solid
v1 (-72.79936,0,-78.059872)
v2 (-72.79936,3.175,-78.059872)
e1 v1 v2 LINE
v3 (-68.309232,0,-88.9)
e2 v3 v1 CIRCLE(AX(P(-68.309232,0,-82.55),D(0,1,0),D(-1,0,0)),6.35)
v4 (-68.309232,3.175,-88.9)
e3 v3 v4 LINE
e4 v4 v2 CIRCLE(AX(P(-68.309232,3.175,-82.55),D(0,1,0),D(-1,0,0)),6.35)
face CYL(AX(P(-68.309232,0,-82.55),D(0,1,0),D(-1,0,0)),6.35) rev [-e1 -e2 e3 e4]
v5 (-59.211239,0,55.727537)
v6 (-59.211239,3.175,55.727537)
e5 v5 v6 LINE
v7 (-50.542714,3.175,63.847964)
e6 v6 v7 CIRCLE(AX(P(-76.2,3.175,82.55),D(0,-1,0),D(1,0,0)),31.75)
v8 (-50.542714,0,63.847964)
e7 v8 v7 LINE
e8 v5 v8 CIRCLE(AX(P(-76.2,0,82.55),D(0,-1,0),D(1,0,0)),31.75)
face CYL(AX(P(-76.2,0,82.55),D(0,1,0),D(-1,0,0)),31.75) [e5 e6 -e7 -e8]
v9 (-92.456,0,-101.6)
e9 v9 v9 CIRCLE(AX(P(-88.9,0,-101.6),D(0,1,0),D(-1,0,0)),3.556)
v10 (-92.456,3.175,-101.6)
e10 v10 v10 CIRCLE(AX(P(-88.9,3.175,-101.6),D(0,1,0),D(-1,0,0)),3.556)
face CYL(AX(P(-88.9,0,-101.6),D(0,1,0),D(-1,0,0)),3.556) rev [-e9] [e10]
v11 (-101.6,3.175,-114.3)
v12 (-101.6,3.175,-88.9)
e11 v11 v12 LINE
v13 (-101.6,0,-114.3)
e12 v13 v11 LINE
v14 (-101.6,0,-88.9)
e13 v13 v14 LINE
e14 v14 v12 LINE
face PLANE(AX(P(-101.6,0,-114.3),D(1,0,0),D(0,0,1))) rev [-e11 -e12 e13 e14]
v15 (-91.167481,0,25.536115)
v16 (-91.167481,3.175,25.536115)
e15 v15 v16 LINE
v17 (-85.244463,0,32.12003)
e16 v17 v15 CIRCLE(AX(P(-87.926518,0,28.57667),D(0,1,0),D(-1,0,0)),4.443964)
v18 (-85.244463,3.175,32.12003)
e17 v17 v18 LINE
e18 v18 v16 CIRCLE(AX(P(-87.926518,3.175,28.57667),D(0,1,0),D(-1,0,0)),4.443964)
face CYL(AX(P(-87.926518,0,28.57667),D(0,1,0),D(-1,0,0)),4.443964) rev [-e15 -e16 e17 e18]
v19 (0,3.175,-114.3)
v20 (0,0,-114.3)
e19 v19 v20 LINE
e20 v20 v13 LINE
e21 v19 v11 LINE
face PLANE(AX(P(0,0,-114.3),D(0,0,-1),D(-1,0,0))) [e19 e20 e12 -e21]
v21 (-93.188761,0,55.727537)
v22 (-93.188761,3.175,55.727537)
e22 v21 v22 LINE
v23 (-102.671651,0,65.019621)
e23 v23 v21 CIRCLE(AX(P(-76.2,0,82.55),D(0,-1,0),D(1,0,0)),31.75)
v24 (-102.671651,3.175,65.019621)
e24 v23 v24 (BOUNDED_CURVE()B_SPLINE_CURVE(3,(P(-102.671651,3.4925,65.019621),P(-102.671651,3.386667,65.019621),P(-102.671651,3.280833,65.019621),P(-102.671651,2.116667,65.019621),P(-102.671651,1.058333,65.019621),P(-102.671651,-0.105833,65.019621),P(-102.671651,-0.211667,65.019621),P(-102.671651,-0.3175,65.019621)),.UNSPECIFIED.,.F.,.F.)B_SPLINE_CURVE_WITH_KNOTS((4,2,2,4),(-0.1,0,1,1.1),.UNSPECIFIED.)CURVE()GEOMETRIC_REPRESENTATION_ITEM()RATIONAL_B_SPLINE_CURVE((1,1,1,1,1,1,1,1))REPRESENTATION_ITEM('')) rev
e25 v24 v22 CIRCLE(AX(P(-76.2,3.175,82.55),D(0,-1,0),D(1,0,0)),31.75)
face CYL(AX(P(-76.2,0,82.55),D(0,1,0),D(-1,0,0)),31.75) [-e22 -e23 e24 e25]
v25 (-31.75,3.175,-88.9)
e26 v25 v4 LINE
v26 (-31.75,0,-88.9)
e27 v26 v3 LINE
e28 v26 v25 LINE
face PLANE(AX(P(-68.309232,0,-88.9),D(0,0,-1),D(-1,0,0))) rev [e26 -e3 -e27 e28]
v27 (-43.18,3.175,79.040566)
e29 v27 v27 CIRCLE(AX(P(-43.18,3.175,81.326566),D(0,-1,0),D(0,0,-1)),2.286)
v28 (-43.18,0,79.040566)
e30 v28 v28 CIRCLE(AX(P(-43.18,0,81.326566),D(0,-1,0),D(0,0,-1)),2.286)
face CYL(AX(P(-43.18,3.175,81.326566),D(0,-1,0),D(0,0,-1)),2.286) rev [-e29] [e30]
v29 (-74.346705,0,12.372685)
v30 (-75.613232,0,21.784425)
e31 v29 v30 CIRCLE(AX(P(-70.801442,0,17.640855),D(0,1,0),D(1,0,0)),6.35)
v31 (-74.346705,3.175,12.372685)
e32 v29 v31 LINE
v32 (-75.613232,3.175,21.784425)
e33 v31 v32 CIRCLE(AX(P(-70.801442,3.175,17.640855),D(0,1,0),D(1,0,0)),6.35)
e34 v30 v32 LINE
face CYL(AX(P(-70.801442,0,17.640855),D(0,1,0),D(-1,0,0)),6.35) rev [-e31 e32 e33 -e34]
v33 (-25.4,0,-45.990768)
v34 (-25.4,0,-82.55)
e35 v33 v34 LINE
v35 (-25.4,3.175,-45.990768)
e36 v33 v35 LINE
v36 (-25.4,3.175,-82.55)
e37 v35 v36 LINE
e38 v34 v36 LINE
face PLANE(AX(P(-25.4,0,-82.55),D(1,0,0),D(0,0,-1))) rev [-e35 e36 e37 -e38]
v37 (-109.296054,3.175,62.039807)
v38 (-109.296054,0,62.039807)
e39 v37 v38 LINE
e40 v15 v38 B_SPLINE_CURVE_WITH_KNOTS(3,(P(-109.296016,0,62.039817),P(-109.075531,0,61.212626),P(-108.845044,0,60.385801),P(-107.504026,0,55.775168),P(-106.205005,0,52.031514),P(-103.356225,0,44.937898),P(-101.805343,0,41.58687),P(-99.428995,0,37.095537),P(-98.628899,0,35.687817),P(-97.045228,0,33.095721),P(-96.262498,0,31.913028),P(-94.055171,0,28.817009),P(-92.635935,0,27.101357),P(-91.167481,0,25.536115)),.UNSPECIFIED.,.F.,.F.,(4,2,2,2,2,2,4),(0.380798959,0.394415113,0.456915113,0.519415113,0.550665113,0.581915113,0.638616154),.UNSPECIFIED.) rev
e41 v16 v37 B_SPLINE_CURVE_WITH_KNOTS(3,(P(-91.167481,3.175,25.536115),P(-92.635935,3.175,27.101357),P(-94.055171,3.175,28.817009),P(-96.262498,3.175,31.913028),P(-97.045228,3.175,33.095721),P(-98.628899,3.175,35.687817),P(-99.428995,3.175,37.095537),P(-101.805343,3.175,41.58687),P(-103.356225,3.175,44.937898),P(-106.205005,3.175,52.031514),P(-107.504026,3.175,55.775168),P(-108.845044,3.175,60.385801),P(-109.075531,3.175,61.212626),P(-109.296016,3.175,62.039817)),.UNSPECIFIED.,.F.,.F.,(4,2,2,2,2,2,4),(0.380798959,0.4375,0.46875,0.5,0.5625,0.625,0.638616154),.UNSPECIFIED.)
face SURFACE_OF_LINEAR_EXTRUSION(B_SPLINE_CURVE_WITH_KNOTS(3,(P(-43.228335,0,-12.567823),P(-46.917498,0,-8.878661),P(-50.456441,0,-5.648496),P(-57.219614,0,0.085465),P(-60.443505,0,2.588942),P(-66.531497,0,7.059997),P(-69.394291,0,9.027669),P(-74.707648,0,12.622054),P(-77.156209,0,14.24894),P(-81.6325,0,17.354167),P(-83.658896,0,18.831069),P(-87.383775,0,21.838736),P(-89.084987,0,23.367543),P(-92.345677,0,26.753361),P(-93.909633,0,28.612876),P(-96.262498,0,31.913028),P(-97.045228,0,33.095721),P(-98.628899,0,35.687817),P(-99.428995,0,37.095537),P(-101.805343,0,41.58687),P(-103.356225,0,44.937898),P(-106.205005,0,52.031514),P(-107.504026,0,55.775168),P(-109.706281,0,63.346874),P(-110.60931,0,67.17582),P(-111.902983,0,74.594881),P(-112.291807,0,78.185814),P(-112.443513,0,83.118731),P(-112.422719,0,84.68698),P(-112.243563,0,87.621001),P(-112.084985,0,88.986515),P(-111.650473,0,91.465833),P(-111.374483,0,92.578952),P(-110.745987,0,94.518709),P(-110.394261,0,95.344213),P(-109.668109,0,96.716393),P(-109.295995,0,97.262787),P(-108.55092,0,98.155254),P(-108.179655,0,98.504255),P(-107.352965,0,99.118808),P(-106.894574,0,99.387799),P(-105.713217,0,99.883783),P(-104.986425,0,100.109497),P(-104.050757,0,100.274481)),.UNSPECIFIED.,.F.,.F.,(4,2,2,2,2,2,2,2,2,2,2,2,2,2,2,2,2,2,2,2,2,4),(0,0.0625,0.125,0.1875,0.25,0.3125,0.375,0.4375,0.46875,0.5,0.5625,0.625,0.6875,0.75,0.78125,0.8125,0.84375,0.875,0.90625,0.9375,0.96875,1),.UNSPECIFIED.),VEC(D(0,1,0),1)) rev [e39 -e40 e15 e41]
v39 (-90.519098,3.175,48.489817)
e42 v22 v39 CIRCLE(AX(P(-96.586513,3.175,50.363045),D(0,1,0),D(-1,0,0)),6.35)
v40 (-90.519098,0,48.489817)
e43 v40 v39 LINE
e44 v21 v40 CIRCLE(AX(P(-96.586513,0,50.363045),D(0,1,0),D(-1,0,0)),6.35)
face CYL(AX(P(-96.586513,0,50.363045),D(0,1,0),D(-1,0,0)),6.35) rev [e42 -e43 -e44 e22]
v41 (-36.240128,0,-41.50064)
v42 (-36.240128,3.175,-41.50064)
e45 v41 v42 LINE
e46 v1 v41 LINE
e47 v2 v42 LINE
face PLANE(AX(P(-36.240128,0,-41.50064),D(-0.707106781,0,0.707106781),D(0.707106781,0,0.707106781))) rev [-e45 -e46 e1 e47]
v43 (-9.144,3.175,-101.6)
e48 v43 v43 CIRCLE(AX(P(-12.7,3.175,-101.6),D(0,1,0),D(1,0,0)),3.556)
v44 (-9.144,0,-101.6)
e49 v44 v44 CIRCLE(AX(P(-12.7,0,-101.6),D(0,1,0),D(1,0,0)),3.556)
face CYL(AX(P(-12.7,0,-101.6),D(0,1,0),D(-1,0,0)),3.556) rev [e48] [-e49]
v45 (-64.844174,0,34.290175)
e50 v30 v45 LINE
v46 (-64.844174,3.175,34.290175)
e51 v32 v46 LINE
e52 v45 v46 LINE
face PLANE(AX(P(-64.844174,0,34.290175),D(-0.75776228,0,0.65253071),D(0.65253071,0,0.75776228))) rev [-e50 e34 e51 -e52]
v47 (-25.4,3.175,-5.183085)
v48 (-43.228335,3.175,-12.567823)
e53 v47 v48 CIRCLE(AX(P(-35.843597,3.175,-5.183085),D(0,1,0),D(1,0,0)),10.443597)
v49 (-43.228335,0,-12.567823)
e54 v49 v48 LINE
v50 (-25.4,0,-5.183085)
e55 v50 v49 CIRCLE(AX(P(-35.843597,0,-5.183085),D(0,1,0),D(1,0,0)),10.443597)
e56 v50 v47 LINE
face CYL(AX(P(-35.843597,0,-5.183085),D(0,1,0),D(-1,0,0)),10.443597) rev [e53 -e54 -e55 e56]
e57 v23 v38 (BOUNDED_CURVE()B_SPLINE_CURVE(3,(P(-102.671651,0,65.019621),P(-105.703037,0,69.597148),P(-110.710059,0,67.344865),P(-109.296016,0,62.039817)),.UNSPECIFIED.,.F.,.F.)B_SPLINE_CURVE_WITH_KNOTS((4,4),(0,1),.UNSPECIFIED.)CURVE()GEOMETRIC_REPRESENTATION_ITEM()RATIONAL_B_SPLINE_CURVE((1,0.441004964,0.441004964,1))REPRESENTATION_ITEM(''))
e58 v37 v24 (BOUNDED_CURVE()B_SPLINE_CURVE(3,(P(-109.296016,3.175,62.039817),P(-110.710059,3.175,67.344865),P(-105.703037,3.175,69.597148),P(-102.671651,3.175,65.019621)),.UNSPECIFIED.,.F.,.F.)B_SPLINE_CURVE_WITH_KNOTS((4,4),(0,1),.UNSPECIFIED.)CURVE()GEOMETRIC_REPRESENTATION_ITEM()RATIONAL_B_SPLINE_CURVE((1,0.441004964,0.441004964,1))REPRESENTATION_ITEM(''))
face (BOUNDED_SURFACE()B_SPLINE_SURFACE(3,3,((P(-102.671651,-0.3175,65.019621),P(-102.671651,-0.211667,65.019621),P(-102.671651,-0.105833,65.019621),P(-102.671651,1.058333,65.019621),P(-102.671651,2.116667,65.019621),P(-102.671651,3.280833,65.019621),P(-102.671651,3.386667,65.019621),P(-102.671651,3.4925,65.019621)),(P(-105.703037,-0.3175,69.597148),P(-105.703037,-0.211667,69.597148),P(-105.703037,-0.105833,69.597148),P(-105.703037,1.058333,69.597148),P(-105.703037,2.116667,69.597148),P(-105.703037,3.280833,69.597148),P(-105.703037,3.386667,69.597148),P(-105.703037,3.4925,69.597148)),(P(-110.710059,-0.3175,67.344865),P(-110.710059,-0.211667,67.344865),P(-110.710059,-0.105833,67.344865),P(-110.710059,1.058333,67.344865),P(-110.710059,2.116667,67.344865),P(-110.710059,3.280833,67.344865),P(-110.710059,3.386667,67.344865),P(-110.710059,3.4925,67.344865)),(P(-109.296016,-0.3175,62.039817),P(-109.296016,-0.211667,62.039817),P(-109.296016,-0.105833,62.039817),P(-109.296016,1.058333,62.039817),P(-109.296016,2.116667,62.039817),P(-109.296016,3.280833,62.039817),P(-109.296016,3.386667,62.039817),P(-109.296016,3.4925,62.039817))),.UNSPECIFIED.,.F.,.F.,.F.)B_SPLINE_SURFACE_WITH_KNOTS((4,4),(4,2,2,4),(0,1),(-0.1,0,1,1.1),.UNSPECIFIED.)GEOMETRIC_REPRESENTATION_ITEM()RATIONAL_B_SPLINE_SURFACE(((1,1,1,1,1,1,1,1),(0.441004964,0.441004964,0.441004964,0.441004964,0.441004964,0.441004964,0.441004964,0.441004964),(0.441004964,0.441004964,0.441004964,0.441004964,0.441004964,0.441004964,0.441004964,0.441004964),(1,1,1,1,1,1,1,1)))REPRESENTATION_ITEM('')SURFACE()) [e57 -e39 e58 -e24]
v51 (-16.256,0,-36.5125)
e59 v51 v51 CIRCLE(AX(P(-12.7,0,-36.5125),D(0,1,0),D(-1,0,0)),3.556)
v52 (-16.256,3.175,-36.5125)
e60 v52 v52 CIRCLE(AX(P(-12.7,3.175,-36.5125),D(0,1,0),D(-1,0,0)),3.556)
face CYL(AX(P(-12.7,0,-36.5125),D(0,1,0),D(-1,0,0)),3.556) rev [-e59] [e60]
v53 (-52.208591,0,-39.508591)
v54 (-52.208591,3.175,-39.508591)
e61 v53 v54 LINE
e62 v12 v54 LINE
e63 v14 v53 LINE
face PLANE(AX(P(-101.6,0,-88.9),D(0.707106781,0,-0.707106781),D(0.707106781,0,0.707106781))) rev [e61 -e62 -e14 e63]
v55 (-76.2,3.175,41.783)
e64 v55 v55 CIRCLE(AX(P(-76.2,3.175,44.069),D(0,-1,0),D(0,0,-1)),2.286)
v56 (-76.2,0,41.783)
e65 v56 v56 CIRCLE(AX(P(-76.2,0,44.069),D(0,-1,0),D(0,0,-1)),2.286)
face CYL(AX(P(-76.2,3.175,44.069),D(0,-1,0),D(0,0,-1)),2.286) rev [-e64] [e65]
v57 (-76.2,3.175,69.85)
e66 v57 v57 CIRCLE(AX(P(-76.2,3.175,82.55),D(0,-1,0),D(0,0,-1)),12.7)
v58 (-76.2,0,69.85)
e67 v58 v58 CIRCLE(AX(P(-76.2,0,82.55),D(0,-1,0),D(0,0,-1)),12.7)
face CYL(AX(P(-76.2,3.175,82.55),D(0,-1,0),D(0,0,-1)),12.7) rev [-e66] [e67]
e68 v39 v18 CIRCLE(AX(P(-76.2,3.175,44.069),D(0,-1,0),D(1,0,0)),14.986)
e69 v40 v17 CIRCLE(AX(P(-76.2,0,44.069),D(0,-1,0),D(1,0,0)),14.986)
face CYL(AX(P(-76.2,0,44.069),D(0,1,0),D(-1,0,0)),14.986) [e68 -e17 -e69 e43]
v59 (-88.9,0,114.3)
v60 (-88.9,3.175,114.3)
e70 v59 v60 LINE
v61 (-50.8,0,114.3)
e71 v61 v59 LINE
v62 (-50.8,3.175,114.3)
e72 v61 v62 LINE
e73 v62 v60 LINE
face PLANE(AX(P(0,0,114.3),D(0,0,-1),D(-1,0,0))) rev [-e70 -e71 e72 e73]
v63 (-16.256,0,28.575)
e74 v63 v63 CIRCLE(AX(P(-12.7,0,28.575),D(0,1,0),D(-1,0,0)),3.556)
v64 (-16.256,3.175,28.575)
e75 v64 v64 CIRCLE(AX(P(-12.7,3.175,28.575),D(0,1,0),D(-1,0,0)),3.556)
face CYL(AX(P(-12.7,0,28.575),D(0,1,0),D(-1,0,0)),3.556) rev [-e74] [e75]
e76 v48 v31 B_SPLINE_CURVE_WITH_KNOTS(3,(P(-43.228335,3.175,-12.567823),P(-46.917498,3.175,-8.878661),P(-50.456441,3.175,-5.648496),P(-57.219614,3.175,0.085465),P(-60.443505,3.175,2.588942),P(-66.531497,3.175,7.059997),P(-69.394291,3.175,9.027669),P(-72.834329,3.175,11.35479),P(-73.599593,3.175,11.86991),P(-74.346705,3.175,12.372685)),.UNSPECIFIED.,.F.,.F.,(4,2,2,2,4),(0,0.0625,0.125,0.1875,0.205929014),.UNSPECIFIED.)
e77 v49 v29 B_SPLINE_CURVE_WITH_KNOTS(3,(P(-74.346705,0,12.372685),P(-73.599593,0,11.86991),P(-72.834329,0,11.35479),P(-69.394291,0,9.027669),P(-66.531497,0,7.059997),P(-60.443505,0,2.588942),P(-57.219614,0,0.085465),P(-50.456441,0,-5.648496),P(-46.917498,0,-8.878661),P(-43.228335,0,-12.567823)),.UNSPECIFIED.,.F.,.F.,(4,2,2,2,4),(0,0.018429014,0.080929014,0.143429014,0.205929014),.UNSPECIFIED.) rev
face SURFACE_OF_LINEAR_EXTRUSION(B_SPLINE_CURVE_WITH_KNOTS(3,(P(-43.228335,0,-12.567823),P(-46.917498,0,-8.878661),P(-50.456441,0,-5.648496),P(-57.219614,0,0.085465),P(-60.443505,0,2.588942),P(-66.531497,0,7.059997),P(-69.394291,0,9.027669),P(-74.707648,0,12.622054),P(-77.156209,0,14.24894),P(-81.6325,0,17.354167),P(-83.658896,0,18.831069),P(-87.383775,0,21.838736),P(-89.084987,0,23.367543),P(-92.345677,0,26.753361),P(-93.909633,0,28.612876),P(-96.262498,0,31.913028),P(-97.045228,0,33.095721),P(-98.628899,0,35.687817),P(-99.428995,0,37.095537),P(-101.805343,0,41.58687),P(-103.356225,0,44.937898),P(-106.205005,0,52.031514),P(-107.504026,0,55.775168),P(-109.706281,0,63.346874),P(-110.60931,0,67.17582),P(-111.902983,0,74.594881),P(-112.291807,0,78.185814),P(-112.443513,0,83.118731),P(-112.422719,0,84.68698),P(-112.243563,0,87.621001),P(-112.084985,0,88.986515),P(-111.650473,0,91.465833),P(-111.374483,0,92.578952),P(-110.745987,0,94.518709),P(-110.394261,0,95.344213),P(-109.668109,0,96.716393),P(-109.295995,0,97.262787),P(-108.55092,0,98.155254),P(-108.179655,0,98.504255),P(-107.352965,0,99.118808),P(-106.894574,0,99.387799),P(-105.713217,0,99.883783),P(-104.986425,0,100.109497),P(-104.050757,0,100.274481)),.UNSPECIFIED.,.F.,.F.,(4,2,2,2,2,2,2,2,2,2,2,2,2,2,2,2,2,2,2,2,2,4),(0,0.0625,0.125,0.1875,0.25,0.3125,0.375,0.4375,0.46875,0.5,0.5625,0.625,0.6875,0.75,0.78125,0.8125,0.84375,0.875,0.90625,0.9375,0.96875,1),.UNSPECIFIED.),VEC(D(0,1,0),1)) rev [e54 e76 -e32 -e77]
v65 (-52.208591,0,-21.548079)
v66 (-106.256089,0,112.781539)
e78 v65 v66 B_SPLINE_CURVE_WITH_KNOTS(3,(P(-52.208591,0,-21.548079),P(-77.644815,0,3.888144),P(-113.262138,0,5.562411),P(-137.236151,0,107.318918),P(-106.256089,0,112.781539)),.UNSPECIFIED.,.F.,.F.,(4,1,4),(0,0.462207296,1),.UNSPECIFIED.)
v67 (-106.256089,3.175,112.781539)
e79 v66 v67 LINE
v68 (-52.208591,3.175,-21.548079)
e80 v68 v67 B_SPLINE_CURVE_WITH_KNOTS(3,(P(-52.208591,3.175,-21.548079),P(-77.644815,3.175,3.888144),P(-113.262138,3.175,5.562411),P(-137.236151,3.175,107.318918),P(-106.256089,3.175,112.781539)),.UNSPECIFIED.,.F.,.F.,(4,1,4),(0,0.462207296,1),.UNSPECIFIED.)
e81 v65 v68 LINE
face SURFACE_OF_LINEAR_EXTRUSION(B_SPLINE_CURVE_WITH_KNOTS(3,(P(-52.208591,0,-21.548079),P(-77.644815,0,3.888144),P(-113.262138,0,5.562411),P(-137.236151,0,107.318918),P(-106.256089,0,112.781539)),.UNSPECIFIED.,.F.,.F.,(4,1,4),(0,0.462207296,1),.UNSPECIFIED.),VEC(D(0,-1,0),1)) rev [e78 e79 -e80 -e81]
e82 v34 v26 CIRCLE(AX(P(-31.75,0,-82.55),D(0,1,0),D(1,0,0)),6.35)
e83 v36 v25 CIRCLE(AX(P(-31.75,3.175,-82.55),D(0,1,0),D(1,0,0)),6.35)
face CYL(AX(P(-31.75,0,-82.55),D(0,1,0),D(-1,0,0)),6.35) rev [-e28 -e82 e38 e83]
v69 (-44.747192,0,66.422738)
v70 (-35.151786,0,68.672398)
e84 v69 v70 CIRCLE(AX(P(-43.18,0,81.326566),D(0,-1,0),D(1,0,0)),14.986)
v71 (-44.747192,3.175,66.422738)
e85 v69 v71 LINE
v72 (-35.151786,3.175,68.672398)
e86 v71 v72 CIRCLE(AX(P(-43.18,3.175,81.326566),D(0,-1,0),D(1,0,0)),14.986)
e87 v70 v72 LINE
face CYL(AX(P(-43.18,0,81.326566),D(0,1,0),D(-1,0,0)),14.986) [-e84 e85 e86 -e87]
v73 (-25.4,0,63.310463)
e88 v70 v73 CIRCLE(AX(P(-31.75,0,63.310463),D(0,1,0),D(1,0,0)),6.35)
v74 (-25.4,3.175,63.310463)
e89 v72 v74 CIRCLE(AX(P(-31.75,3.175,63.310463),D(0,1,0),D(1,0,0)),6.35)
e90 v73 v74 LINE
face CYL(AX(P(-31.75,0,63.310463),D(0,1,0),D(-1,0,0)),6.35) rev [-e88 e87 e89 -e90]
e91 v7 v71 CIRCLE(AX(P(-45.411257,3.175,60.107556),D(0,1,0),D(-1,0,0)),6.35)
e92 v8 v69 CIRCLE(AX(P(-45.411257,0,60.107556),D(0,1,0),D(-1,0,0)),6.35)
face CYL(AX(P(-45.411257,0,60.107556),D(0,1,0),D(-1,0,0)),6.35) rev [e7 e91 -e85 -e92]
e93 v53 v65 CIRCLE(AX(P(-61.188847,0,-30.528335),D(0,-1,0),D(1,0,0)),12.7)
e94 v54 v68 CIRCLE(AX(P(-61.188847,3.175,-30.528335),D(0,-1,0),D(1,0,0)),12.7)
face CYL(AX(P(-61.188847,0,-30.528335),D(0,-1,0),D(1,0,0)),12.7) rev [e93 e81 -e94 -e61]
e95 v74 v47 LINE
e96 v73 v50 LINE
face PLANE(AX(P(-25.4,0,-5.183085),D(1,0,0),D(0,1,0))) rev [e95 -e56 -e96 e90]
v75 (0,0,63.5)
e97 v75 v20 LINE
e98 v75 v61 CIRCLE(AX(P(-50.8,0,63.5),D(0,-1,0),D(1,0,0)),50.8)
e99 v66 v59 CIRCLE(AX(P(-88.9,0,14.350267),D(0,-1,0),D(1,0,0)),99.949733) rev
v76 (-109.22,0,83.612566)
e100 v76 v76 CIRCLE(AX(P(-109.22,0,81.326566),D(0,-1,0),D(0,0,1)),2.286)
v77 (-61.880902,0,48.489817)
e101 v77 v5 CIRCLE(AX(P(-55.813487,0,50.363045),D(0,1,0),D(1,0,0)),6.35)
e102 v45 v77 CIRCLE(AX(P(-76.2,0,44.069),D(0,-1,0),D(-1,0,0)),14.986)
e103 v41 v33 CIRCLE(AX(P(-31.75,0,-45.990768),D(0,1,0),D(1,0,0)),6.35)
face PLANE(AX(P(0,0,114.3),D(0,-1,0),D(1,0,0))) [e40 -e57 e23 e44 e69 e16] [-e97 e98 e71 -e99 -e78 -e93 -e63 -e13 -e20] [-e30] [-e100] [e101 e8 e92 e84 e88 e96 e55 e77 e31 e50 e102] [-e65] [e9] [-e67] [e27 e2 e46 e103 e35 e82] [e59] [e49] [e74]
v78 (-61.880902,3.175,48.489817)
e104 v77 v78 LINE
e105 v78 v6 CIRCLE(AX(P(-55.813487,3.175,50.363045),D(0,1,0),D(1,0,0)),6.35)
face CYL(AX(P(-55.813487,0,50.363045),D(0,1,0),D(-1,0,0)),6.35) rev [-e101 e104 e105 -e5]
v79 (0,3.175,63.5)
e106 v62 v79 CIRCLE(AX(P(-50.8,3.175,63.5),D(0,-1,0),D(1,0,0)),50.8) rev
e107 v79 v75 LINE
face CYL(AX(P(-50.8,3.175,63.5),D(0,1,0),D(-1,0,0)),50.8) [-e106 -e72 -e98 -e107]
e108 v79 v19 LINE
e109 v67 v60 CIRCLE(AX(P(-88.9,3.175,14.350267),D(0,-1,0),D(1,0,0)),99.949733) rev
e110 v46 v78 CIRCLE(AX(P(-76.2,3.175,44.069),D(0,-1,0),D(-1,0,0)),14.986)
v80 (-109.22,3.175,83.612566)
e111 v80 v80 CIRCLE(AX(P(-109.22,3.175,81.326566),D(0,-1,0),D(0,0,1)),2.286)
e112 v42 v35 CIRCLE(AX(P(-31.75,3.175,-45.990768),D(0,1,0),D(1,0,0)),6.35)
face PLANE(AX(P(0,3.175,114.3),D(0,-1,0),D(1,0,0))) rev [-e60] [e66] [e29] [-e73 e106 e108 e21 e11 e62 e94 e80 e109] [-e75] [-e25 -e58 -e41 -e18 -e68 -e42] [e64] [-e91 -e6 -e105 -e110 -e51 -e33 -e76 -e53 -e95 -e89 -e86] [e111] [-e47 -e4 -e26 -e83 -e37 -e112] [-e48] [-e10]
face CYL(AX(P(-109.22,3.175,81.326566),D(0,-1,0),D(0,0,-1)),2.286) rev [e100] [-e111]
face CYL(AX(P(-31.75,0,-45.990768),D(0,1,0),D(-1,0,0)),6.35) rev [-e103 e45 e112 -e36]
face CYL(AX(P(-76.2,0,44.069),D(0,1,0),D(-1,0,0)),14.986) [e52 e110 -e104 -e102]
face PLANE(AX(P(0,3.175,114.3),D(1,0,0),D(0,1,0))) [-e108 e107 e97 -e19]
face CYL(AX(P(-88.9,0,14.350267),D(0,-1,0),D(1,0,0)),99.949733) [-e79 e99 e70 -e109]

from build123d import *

# Parameters (mm, degrees)
SKETCH1_W               = 254
SKETCH1_H               = 3.175
BASE_FLANGE1_DEPTH      = 114.3
SKETCH6_R               = 12.7
CUT_EXTRUDE1_DEPTH      = 279.550840288
SKETCH7_R               = 2.286
CUT_EXTRUDE2_DEPTH      = 279.550840288
SKETCH9_R               = 3.556
CUT_EXTRUDE4_DEPTH      = 279.550840288
CUT_EXTRUDE6_DEPTH      = 279.550840288
CUT_EXTRUDE9_DEPTH      = 279.550840288
CUT_EXTRUDE9_DEPTH_BACK = 279.550840288
CUT_EXTRUDE10_DEPTH     = 221.768639368
FILLET1_R               = 50.8
CUT_EXTRUDE11_DEPTH     = 170.498049701
FILLET2_DEPTH           = 3.175


with BuildPart() as part:
    # Base-Flange1: sheet metal written as solids
    # Sketch1 → Base-Flange1 (new, symmetric)
    with BuildSketch(Plane.XY):
        with Locations((-127, 1.5875)):
            Rectangle(SKETCH1_W, SKETCH1_H)
    extrude(amount=BASE_FLANGE1_DEPTH, both=True)

    # Sketch6 → Cut-Extrude1 (cut, through all)
    with BuildSketch(Plane.XZ):
        with Locations(Location((-76.2, 82.55, 0), (0, 0, 270))):
            Circle(SKETCH6_R)
    extrude(amount=-CUT_EXTRUDE1_DEPTH, mode=Mode.SUBTRACT)

    # Sketch7 → Cut-Extrude2 (cut, through all)
    with BuildSketch(Plane.XZ):
        with Locations(Location((-43.18, 81.326566426, 0), (0, 0, 270))):
            Circle(SKETCH7_R)
        with Locations(Location((-109.22, 81.326566426, 0), (0, 0, 90))):
            Circle(SKETCH7_R)
        with Locations(Location((-76.2, 44.069, 0), (0, 0, 270))):
            Circle(SKETCH7_R)
    extrude(amount=-CUT_EXTRUDE2_DEPTH, mode=Mode.SUBTRACT)

    # Sketch9 → Cut-Extrude4 (cut, through all)
    with BuildSketch(Plane(origin=(0, 3.175, 0), x_dir=(1, 0, 0), z_dir=(0, 1, 0))):
        with Locations(Location((-12.7, 36.5125, 0), (0, 0, 180))):
            Circle(SKETCH9_R)
        with Locations((-12.7, 101.6)):
            Circle(SKETCH9_R)
        with Locations(Location((-12.7, -28.575, 0), (0, 0, 180))):
            Circle(SKETCH9_R)
        with Locations(Location((-88.9, 101.6, 0), (0, 0, 180))):
            Circle(SKETCH9_R)
    extrude(amount=-CUT_EXTRUDE4_DEPTH, mode=Mode.SUBTRACT)

    # Sketch15 → Cut-Extrude6 (cut, through all)
    with BuildSketch(Plane.XZ):
        Polygon((-101.6, -114.3), (-254, 38.1), (-254, -114.3), align=None)
    extrude(amount=-CUT_EXTRUDE6_DEPTH, mode=Mode.SUBTRACT)

    # Sketch17 → Cut-Extrude9 (cut, two sides: drawn at the far end of the back side and taken through both)
    with BuildSketch(Plane.XZ.offset(-CUT_EXTRUDE9_DEPTH_BACK)):
        with BuildLine():
            Line((-254, 114.3), (-254, 38.1))
            Line((-254, 38.1), (-159.5751337, -56.3248663))
            ThreePointArc((-159.5751337, -56.3248663), (-181.24151223, 52.599374135), (-88.9, 114.3))
            Line((-88.9, 114.3), (-254, 114.3))
        make_face()
    extrude(amount=CUT_EXTRUDE9_DEPTH + CUT_EXTRUDE9_DEPTH_BACK, mode=Mode.SUBTRACT)

    # Sketch18 → Cut-Extrude10 (cut, through all)
    with BuildSketch(Plane.XZ):
        with BuildLine():
            Line((-101.6, -114.3), (-101.6, -88.9))
            Line((-101.6, -88.9), (-52.208591334, -39.508591334))
            ThreePointArc((-52.208591334, -39.508591334), (-48.488847455, -30.528335213), (-52.208591334, -21.548079092))
            add(Edge.make_bspline(
                [(-106.256088924, 112.781538976), (-137.236150888, 107.318918188), (-113.262137977, 5.562411407), (-77.644814764, 3.888144338), (-52.208591334, -21.548079092)],
                knots=[0, 0, 0, 0, 0.537792704, 1, 1, 1, 1], degree=3))
            ThreePointArc((-106.256088924, 112.781538976), (-184.223754204, 44.405731651), (-159.5751337, -56.3248663))
            Line((-159.5751337, -56.3248663), (-101.6, -114.3))
        make_face()
    extrude(amount=-CUT_EXTRUDE10_DEPTH, mode=Mode.SUBTRACT)

    # Fillet1
    fillet1_edges = [part.edges().sort_by_distance(p)[0] for p in [
        (0, 1.5875, 114.3),
    ]]
    fillet(fillet1_edges, radius=FILLET1_R)

    # Sketch19 → Cut-Extrude11 (cut, through all)
    with BuildSketch(Plane(origin=(0, 3.175, 0), x_dir=(1, 0, 0), z_dir=(0, 1, 0))):
        with BuildLine():
            Line((-68.309231637, 88.9), (-31.75, 88.9))
            ThreePointArc((-31.75, 88.9), (-27.259871939, 87.040128061), (-25.4, 82.55))
            Line((-25.4, 82.55), (-25.4, 45.990768363))
            ThreePointArc((-25.4, 45.990768363), (-29.319960204, 40.124133332), (-36.240128061, 41.500640303))
            Line((-36.240128061, 41.500640303), (-72.799359697, 78.059871939))
            ThreePointArc((-72.799359697, 78.059871939), (-74.175866668, 84.980039796), (-68.309231637, 88.9))
        make_face()
        with BuildLine():
            Line((-25.4, 5.183084731), (-25.4, -63.31046263))
            ThreePointArc((-25.4, -63.31046263), (-28.690493445, -68.874806225), (-35.151785714, -68.672398284))
            ThreePointArc((-35.151785714, -68.672398284), (-39.759262533, -66.736201414), (-44.747192121, -66.422737896))
            ThreePointArc((-44.747192121, -66.422737896), (-47.9893887, -65.910636081), (-50.542713816, -63.847963596))
            ThreePointArc((-50.542713816, -63.847963596), (-54.493856691, -59.378771231), (-59.211239435, -55.727537129))
            ThreePointArc((-59.211239435, -55.727537129), (-61.771128872, -52.560544764), (-61.88090181, -48.489817008))
            ThreePointArc((-61.88090181, -48.489817008), (-61.530034533, -41.007577259), (-64.844174471, -34.290174786))
            Line((-64.844174471, -34.290174786), (-75.613232293, -21.784424959))
            ThreePointArc((-75.613232293, -21.784424959), (-77.094715661, -16.793975806), (-74.346704518, -12.372685217))
            add(Edge.make_bspline(
                [(-43.228335213, 12.567822971), (-46.917497652, 8.878660532), (-50.456440758, 5.648495964), (-57.219614246, -0.085464925), (-60.443504999, -2.588941631), (-66.531496779, -7.059997253), (-69.394290936, -9.027669237), (-72.834328708, -11.354789552), (-73.599593433, -11.869910022), (-74.346704518, -12.372685217)],
                knots=[0, 0, 0, 0, 0.0625, 0.0625, 0.125, 0.125, 0.1875, 0.1875, 0.205929014, 0.205929014, 0.205929014, 0.205929014], degree=3))
            ThreePointArc((-43.228335213, 12.567822971), (-31.847005437, 14.831710221), (-25.4, 5.183084731))
        make_face()
        with BuildLine():
            ThreePointArc((-110.360018807, -66.383991242), (-107.147438621, -66.484575814), (-104.030197179, -67.267898542))
            ThreePointArc((-104.030197179, -67.267898542), (-99.340434929, -60.811031043), (-93.188760565, -55.727537129))
            ThreePointArc((-93.188760565, -55.727537129), (-90.628871128, -52.560544764), (-90.51909819, -48.489817008))
            ThreePointArc((-90.51909819, -48.489817008), (-90.463817251, -39.472945885), (-85.244463491, -32.12003033))
            ThreePointArc((-85.244463491, -32.12003033), (-84.622720301, -25.604510261), (-91.167480683, -25.536115004))
            add(Edge.make_bspline(
                [(-91.167480683, -25.536115004), (-92.635934993, -27.101357134), (-94.055170685, -28.817008687), (-96.262497765, -31.913028022), (-97.045227937, -33.09572145), (-98.628898545, -35.6878173), (-99.428995475, -37.095537018), (-101.805342608, -41.586869819), (-103.35622482, -44.937897773), (-106.205005263, -52.031513868), (-107.504026121, -55.775168297), (-109.265538459, -61.831529556), (-109.854670713, -64.117538163), (-110.360018807, -66.383991242)],
                knots=[0.380798959, 0.380798959, 0.380798959, 0.380798959, 0.4375, 0.4375, 0.46875, 0.46875, 0.5, 0.5, 0.5625, 0.5625, 0.625, 0.625, 0.662483442, 0.662483442, 0.662483442, 0.662483442], degree=3))
        make_face()
    extrude(amount=-CUT_EXTRUDE11_DEPTH, mode=Mode.SUBTRACT)

    # Fillet2: read off the stored shape, not the designer's step
    # Fillet2 outline → Fillet2 (add)
    with BuildSketch(Plane(origin=(0, 0, 0), x_dir=(1.0, 1.1573850035061633e-12, 0), z_dir=(-1.1573850035061633e-12, 1.0, 0))):
        with BuildLine():
            ThreePointArc((-104.030197179, -67.267898542), (-103.374185767, -66.129703781), (-102.671651197, -65.019621142))
            add(Edge.make_bspline(
                [(-102.671651197, -65.019621142), (-103.429510547, -66.164022442), (-104.780608937, -66.91555764), (-106.42610863, -66.603307038)],
                knots=[0, 0, 0, 0, 0.430480656, 0.430480656, 0.430480656, 0.430480656], degree=3, weights=[1, 0.75936345, 0.62231628, 0.58885849]))
            ThreePointArc((-106.42610863, -66.603307038), (-105.214346034, -66.885827792), (-104.030197179, -67.267898542))
        make_face()
        with BuildLine():
            ThreePointArc((-110.360018807, -66.383991242), (-108.385824678, -66.363801056), (-106.42610863, -66.603307038))
            add(Edge.make_bspline(
                [(-106.42610863, -66.603307038), (-108.913766663, -66.131248173), (-109.817041103, -63.994539841), (-109.296016182, -62.039816736)],
                knots=[0.430480656, 0.430480656, 0.430480656, 0.430480656, 1, 1, 1, 1], degree=3, weights=[0.58885849, 0.544594344, 0.681641514, 1]))
            add(Edge.make_bspline(
                [(-109.296016182, -62.039816736), (-109.682496439, -63.489770196), (-110.038242372, -64.940845021), (-110.360018807, -66.383991242)],
                knots=[0.638616154, 0.638616154, 0.638616154, 0.638616154, 0.662483442, 0.662483442, 0.662483442, 0.662483442], degree=3))
        make_face()
    extrude(amount=FILLET2_DEPTH)


solid = part.part
